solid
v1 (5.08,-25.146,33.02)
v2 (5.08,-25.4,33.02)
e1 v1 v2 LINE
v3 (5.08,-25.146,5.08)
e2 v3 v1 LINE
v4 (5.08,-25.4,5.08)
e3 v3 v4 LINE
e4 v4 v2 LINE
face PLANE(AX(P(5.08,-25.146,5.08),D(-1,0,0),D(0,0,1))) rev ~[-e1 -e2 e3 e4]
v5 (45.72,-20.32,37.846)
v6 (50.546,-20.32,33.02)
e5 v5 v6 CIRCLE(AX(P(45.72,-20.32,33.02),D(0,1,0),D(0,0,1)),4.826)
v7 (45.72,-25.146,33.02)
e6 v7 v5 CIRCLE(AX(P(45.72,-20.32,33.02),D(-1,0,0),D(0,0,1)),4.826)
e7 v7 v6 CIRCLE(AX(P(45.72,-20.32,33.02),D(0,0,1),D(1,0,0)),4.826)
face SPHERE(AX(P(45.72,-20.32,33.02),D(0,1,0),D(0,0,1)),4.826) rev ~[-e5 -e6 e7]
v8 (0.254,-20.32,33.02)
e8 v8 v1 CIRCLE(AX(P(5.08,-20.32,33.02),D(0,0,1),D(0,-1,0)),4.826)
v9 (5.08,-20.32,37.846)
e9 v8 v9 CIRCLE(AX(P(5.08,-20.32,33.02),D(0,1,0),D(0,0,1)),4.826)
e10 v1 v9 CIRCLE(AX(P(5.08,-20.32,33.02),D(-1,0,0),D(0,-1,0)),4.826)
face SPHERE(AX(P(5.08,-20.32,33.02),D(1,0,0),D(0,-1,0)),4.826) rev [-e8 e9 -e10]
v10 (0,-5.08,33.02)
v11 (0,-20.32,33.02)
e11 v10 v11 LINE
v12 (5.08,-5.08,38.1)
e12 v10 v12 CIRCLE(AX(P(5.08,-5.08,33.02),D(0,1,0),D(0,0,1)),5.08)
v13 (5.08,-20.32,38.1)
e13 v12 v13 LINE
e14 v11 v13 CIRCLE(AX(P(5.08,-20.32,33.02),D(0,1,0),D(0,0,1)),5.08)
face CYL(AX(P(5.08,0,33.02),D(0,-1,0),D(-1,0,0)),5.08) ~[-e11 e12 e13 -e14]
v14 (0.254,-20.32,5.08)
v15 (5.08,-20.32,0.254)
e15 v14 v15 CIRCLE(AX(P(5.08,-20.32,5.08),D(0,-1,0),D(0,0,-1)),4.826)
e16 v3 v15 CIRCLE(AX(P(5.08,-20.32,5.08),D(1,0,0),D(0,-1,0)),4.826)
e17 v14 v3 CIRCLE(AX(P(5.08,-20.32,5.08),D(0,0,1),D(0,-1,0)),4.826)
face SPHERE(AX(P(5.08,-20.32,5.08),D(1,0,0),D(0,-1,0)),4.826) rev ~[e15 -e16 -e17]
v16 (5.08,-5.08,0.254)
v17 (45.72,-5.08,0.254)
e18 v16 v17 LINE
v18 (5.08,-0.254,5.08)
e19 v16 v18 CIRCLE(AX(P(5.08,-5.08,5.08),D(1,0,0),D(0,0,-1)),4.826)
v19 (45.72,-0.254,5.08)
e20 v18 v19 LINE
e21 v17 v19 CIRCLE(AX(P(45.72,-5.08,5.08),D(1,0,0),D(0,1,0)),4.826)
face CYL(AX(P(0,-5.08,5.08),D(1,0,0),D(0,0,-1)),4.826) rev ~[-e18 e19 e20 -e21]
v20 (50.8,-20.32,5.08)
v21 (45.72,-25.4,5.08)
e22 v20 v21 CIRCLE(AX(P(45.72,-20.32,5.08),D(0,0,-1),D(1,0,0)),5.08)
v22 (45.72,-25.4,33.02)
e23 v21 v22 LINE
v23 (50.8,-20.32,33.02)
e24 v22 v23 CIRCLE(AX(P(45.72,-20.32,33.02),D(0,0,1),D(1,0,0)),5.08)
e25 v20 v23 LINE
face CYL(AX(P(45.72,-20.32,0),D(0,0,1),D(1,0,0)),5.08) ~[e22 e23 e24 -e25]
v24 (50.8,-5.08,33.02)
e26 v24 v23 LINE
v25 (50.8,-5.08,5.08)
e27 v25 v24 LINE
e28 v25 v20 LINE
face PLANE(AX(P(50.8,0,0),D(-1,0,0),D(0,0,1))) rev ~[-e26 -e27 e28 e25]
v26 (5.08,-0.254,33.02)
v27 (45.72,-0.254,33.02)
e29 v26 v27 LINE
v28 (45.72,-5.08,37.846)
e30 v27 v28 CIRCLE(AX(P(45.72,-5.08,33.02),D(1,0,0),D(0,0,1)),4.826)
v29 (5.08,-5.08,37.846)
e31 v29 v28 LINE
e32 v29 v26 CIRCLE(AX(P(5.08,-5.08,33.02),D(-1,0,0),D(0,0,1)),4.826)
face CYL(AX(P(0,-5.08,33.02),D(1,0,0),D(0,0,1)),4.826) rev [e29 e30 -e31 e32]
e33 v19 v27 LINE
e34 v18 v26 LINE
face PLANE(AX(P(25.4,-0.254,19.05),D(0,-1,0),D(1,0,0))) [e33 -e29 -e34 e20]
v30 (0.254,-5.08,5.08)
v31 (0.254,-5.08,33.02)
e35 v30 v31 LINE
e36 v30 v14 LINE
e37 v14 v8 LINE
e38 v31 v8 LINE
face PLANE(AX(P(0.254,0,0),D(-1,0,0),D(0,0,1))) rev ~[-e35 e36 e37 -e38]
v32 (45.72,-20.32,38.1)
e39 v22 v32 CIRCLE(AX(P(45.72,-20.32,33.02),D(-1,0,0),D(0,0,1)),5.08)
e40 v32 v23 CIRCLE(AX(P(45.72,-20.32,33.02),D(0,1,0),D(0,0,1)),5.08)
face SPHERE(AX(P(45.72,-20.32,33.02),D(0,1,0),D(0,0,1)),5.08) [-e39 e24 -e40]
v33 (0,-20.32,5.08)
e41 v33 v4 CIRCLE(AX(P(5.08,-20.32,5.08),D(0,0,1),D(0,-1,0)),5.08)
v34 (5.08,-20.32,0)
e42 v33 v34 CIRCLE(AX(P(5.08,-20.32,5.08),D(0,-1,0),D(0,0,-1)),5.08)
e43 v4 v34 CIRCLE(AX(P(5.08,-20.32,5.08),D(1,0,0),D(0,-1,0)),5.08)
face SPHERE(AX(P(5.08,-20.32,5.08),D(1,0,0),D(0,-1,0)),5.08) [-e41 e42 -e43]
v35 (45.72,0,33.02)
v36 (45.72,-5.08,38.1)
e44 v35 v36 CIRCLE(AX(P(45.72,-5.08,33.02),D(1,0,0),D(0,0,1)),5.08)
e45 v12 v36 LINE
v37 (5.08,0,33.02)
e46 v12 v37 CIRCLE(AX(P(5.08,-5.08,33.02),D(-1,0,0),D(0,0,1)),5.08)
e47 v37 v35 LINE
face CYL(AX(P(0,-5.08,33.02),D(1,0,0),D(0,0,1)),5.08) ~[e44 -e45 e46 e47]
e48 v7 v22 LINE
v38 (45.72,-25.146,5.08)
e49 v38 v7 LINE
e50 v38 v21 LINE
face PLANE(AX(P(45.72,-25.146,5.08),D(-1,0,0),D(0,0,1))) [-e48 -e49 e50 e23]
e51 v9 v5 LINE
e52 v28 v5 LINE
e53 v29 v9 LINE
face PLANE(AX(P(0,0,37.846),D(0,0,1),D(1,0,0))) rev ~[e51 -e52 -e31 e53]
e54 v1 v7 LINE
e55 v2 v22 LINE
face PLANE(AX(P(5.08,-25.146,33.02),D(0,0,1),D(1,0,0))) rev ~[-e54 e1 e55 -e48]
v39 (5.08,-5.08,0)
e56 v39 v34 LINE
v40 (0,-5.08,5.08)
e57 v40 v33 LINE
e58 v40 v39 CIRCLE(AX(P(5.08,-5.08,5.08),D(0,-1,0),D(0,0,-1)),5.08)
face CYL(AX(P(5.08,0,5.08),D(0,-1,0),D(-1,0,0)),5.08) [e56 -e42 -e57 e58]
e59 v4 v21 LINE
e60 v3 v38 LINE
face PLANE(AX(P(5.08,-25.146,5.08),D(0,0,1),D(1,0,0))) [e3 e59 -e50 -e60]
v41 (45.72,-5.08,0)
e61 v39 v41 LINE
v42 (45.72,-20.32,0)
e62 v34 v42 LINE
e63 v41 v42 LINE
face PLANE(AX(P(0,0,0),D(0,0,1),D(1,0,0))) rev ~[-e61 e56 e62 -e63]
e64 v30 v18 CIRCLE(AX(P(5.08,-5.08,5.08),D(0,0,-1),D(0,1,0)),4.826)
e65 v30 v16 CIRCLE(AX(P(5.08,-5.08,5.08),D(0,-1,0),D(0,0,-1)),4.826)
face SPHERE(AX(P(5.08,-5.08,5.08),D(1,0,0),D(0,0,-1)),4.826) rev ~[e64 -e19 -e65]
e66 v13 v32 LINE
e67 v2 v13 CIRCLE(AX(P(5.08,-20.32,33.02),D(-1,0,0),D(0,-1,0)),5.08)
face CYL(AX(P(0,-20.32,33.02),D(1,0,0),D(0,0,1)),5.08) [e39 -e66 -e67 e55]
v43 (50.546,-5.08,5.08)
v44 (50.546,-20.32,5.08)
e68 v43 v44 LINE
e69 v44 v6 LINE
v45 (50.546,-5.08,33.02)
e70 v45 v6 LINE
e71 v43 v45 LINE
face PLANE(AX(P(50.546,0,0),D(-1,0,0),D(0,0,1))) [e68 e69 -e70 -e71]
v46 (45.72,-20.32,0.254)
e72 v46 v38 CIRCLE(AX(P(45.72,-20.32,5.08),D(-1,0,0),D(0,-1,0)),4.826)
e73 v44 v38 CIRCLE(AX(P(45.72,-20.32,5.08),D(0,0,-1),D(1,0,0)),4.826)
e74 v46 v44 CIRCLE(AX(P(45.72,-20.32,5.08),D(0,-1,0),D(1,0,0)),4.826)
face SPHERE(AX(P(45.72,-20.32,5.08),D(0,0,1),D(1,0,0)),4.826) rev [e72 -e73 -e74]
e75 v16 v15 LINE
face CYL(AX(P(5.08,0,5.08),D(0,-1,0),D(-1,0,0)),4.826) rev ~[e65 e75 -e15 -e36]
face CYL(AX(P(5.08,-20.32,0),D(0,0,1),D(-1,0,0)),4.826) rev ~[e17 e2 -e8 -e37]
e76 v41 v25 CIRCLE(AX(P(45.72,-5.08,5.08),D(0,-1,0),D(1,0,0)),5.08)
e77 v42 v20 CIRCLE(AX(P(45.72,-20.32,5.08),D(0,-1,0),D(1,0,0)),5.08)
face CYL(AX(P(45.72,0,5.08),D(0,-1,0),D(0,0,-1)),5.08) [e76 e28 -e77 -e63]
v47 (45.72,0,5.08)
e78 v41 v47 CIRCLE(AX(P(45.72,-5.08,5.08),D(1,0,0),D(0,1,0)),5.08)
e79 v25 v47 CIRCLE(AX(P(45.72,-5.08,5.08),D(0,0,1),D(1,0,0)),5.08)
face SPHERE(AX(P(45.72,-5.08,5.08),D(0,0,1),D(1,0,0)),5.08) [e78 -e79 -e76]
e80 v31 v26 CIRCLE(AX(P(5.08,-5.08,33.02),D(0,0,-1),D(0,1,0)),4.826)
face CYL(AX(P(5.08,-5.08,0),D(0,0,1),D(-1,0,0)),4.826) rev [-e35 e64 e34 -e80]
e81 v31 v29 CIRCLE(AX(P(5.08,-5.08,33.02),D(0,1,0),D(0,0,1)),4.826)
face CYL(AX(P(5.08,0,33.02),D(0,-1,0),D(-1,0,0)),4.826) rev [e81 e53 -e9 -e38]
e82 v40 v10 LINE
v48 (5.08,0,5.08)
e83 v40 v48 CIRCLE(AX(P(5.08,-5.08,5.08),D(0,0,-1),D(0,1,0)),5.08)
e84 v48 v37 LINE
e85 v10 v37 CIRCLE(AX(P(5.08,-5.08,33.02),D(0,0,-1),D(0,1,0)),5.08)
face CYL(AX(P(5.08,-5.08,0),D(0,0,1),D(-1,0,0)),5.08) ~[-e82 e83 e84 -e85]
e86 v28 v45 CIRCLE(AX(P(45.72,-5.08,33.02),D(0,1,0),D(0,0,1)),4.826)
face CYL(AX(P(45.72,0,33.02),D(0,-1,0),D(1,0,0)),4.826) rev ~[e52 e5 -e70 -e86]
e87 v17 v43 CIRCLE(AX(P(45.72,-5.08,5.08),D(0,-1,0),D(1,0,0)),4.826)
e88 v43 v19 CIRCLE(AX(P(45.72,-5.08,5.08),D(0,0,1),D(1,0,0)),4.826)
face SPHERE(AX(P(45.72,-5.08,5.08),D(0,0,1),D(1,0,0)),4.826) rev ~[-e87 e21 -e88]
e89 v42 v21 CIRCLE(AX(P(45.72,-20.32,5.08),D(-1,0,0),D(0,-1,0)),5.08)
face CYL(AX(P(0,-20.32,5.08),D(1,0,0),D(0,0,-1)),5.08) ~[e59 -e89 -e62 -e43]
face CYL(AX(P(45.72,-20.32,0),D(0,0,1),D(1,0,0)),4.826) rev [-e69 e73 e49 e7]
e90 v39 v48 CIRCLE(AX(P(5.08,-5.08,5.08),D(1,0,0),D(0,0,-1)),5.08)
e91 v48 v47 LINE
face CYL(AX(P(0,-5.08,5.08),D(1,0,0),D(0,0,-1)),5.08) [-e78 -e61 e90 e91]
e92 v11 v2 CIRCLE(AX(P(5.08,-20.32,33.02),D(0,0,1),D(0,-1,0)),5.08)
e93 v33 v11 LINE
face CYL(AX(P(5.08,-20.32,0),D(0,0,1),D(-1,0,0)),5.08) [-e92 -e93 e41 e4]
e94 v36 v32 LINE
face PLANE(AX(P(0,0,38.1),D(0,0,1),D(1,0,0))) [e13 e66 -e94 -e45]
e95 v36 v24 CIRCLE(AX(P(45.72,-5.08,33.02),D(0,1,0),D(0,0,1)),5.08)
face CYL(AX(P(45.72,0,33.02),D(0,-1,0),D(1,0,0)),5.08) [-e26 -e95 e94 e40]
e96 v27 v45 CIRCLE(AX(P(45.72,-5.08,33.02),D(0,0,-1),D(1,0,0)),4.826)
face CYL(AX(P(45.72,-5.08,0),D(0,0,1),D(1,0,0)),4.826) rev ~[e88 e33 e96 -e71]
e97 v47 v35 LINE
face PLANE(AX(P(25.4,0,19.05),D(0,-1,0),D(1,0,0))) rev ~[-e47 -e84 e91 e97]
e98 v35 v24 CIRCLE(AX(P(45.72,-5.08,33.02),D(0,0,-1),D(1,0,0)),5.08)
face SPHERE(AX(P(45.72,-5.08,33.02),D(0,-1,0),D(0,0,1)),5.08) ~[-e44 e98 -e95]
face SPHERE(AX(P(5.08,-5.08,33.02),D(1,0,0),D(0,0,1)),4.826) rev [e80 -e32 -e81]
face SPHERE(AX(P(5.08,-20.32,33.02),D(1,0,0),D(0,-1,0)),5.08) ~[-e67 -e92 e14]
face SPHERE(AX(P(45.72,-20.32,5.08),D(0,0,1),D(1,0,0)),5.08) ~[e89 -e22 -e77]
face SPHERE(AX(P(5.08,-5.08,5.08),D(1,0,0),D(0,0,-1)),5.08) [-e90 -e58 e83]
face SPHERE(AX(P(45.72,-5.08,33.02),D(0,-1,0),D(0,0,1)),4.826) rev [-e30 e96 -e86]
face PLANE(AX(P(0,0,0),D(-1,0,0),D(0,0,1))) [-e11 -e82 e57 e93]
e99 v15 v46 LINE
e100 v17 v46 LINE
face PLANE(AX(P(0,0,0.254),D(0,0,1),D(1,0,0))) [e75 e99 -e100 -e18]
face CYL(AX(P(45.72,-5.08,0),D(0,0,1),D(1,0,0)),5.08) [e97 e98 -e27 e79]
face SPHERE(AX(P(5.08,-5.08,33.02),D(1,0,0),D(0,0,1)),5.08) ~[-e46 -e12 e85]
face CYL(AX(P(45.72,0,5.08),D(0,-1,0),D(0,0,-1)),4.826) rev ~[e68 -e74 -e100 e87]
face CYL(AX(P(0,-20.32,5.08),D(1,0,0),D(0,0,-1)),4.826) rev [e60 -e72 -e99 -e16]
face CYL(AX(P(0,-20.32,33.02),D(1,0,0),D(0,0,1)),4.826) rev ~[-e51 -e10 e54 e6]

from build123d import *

# Parameters (mm, degrees)
F0_W     = 50.8
F0_H     = 38.1
F1_DEPTH = 25.4
F2_R     = 5.08
F3_T     = -0.254


# Not quite as in the source:
# - a shell that OpenCascade refuses in one call is made with other operations: the cavity is built on its own and cut out


with BuildPart() as f1:
    # F0 (on Front) → F1 (new body)
    with BuildSketch(Plane.XZ):
        with Locations((25.4, 19.05)):
            Rectangle(F0_W, F0_H)
    extrude(amount=F1_DEPTH)

    # F2
    f2_edges = [f1.edges().sort_by_distance(p)[0] for p in [
        (50.8, -12.7, 38.1),
        (25.4, -25.4, 38.1),
        (25.4, 0, 38.1),
        (50.8, -25.4, 19.05),
        (50.8, 0, 19.05),
        (50.8, -12.7, 0),
        (25.4, -25.4, 0),
        (25.4, 0, 0),
        (0, -25.4, 19.05),
        (0, -12.7, 38.1),
        (0, -12.7, 0),
        (0, 0, 19.05),
    ]]
    fillet(f2_edges, radius=F2_R)

    # F3: a shell. OpenCascade refuses it in one call, so the cavity is built on its own and cut out:
    # the body offset inwards by the wall thickness, plus a prism from it out through each open face.
    f3_core = offset(f1.part, amount=F3_T, mode=Mode.PRIVATE)
    f3_exits = [f3_core.faces().sort_by_distance(p)[0] for p in [
        (25.4, -25.146, 19.05),
    ]]
    add(f3_core, mode=Mode.SUBTRACT)
    extrude(f3_exits, amount=-F3_T, mode=Mode.SUBTRACT)


solid = f1.part
